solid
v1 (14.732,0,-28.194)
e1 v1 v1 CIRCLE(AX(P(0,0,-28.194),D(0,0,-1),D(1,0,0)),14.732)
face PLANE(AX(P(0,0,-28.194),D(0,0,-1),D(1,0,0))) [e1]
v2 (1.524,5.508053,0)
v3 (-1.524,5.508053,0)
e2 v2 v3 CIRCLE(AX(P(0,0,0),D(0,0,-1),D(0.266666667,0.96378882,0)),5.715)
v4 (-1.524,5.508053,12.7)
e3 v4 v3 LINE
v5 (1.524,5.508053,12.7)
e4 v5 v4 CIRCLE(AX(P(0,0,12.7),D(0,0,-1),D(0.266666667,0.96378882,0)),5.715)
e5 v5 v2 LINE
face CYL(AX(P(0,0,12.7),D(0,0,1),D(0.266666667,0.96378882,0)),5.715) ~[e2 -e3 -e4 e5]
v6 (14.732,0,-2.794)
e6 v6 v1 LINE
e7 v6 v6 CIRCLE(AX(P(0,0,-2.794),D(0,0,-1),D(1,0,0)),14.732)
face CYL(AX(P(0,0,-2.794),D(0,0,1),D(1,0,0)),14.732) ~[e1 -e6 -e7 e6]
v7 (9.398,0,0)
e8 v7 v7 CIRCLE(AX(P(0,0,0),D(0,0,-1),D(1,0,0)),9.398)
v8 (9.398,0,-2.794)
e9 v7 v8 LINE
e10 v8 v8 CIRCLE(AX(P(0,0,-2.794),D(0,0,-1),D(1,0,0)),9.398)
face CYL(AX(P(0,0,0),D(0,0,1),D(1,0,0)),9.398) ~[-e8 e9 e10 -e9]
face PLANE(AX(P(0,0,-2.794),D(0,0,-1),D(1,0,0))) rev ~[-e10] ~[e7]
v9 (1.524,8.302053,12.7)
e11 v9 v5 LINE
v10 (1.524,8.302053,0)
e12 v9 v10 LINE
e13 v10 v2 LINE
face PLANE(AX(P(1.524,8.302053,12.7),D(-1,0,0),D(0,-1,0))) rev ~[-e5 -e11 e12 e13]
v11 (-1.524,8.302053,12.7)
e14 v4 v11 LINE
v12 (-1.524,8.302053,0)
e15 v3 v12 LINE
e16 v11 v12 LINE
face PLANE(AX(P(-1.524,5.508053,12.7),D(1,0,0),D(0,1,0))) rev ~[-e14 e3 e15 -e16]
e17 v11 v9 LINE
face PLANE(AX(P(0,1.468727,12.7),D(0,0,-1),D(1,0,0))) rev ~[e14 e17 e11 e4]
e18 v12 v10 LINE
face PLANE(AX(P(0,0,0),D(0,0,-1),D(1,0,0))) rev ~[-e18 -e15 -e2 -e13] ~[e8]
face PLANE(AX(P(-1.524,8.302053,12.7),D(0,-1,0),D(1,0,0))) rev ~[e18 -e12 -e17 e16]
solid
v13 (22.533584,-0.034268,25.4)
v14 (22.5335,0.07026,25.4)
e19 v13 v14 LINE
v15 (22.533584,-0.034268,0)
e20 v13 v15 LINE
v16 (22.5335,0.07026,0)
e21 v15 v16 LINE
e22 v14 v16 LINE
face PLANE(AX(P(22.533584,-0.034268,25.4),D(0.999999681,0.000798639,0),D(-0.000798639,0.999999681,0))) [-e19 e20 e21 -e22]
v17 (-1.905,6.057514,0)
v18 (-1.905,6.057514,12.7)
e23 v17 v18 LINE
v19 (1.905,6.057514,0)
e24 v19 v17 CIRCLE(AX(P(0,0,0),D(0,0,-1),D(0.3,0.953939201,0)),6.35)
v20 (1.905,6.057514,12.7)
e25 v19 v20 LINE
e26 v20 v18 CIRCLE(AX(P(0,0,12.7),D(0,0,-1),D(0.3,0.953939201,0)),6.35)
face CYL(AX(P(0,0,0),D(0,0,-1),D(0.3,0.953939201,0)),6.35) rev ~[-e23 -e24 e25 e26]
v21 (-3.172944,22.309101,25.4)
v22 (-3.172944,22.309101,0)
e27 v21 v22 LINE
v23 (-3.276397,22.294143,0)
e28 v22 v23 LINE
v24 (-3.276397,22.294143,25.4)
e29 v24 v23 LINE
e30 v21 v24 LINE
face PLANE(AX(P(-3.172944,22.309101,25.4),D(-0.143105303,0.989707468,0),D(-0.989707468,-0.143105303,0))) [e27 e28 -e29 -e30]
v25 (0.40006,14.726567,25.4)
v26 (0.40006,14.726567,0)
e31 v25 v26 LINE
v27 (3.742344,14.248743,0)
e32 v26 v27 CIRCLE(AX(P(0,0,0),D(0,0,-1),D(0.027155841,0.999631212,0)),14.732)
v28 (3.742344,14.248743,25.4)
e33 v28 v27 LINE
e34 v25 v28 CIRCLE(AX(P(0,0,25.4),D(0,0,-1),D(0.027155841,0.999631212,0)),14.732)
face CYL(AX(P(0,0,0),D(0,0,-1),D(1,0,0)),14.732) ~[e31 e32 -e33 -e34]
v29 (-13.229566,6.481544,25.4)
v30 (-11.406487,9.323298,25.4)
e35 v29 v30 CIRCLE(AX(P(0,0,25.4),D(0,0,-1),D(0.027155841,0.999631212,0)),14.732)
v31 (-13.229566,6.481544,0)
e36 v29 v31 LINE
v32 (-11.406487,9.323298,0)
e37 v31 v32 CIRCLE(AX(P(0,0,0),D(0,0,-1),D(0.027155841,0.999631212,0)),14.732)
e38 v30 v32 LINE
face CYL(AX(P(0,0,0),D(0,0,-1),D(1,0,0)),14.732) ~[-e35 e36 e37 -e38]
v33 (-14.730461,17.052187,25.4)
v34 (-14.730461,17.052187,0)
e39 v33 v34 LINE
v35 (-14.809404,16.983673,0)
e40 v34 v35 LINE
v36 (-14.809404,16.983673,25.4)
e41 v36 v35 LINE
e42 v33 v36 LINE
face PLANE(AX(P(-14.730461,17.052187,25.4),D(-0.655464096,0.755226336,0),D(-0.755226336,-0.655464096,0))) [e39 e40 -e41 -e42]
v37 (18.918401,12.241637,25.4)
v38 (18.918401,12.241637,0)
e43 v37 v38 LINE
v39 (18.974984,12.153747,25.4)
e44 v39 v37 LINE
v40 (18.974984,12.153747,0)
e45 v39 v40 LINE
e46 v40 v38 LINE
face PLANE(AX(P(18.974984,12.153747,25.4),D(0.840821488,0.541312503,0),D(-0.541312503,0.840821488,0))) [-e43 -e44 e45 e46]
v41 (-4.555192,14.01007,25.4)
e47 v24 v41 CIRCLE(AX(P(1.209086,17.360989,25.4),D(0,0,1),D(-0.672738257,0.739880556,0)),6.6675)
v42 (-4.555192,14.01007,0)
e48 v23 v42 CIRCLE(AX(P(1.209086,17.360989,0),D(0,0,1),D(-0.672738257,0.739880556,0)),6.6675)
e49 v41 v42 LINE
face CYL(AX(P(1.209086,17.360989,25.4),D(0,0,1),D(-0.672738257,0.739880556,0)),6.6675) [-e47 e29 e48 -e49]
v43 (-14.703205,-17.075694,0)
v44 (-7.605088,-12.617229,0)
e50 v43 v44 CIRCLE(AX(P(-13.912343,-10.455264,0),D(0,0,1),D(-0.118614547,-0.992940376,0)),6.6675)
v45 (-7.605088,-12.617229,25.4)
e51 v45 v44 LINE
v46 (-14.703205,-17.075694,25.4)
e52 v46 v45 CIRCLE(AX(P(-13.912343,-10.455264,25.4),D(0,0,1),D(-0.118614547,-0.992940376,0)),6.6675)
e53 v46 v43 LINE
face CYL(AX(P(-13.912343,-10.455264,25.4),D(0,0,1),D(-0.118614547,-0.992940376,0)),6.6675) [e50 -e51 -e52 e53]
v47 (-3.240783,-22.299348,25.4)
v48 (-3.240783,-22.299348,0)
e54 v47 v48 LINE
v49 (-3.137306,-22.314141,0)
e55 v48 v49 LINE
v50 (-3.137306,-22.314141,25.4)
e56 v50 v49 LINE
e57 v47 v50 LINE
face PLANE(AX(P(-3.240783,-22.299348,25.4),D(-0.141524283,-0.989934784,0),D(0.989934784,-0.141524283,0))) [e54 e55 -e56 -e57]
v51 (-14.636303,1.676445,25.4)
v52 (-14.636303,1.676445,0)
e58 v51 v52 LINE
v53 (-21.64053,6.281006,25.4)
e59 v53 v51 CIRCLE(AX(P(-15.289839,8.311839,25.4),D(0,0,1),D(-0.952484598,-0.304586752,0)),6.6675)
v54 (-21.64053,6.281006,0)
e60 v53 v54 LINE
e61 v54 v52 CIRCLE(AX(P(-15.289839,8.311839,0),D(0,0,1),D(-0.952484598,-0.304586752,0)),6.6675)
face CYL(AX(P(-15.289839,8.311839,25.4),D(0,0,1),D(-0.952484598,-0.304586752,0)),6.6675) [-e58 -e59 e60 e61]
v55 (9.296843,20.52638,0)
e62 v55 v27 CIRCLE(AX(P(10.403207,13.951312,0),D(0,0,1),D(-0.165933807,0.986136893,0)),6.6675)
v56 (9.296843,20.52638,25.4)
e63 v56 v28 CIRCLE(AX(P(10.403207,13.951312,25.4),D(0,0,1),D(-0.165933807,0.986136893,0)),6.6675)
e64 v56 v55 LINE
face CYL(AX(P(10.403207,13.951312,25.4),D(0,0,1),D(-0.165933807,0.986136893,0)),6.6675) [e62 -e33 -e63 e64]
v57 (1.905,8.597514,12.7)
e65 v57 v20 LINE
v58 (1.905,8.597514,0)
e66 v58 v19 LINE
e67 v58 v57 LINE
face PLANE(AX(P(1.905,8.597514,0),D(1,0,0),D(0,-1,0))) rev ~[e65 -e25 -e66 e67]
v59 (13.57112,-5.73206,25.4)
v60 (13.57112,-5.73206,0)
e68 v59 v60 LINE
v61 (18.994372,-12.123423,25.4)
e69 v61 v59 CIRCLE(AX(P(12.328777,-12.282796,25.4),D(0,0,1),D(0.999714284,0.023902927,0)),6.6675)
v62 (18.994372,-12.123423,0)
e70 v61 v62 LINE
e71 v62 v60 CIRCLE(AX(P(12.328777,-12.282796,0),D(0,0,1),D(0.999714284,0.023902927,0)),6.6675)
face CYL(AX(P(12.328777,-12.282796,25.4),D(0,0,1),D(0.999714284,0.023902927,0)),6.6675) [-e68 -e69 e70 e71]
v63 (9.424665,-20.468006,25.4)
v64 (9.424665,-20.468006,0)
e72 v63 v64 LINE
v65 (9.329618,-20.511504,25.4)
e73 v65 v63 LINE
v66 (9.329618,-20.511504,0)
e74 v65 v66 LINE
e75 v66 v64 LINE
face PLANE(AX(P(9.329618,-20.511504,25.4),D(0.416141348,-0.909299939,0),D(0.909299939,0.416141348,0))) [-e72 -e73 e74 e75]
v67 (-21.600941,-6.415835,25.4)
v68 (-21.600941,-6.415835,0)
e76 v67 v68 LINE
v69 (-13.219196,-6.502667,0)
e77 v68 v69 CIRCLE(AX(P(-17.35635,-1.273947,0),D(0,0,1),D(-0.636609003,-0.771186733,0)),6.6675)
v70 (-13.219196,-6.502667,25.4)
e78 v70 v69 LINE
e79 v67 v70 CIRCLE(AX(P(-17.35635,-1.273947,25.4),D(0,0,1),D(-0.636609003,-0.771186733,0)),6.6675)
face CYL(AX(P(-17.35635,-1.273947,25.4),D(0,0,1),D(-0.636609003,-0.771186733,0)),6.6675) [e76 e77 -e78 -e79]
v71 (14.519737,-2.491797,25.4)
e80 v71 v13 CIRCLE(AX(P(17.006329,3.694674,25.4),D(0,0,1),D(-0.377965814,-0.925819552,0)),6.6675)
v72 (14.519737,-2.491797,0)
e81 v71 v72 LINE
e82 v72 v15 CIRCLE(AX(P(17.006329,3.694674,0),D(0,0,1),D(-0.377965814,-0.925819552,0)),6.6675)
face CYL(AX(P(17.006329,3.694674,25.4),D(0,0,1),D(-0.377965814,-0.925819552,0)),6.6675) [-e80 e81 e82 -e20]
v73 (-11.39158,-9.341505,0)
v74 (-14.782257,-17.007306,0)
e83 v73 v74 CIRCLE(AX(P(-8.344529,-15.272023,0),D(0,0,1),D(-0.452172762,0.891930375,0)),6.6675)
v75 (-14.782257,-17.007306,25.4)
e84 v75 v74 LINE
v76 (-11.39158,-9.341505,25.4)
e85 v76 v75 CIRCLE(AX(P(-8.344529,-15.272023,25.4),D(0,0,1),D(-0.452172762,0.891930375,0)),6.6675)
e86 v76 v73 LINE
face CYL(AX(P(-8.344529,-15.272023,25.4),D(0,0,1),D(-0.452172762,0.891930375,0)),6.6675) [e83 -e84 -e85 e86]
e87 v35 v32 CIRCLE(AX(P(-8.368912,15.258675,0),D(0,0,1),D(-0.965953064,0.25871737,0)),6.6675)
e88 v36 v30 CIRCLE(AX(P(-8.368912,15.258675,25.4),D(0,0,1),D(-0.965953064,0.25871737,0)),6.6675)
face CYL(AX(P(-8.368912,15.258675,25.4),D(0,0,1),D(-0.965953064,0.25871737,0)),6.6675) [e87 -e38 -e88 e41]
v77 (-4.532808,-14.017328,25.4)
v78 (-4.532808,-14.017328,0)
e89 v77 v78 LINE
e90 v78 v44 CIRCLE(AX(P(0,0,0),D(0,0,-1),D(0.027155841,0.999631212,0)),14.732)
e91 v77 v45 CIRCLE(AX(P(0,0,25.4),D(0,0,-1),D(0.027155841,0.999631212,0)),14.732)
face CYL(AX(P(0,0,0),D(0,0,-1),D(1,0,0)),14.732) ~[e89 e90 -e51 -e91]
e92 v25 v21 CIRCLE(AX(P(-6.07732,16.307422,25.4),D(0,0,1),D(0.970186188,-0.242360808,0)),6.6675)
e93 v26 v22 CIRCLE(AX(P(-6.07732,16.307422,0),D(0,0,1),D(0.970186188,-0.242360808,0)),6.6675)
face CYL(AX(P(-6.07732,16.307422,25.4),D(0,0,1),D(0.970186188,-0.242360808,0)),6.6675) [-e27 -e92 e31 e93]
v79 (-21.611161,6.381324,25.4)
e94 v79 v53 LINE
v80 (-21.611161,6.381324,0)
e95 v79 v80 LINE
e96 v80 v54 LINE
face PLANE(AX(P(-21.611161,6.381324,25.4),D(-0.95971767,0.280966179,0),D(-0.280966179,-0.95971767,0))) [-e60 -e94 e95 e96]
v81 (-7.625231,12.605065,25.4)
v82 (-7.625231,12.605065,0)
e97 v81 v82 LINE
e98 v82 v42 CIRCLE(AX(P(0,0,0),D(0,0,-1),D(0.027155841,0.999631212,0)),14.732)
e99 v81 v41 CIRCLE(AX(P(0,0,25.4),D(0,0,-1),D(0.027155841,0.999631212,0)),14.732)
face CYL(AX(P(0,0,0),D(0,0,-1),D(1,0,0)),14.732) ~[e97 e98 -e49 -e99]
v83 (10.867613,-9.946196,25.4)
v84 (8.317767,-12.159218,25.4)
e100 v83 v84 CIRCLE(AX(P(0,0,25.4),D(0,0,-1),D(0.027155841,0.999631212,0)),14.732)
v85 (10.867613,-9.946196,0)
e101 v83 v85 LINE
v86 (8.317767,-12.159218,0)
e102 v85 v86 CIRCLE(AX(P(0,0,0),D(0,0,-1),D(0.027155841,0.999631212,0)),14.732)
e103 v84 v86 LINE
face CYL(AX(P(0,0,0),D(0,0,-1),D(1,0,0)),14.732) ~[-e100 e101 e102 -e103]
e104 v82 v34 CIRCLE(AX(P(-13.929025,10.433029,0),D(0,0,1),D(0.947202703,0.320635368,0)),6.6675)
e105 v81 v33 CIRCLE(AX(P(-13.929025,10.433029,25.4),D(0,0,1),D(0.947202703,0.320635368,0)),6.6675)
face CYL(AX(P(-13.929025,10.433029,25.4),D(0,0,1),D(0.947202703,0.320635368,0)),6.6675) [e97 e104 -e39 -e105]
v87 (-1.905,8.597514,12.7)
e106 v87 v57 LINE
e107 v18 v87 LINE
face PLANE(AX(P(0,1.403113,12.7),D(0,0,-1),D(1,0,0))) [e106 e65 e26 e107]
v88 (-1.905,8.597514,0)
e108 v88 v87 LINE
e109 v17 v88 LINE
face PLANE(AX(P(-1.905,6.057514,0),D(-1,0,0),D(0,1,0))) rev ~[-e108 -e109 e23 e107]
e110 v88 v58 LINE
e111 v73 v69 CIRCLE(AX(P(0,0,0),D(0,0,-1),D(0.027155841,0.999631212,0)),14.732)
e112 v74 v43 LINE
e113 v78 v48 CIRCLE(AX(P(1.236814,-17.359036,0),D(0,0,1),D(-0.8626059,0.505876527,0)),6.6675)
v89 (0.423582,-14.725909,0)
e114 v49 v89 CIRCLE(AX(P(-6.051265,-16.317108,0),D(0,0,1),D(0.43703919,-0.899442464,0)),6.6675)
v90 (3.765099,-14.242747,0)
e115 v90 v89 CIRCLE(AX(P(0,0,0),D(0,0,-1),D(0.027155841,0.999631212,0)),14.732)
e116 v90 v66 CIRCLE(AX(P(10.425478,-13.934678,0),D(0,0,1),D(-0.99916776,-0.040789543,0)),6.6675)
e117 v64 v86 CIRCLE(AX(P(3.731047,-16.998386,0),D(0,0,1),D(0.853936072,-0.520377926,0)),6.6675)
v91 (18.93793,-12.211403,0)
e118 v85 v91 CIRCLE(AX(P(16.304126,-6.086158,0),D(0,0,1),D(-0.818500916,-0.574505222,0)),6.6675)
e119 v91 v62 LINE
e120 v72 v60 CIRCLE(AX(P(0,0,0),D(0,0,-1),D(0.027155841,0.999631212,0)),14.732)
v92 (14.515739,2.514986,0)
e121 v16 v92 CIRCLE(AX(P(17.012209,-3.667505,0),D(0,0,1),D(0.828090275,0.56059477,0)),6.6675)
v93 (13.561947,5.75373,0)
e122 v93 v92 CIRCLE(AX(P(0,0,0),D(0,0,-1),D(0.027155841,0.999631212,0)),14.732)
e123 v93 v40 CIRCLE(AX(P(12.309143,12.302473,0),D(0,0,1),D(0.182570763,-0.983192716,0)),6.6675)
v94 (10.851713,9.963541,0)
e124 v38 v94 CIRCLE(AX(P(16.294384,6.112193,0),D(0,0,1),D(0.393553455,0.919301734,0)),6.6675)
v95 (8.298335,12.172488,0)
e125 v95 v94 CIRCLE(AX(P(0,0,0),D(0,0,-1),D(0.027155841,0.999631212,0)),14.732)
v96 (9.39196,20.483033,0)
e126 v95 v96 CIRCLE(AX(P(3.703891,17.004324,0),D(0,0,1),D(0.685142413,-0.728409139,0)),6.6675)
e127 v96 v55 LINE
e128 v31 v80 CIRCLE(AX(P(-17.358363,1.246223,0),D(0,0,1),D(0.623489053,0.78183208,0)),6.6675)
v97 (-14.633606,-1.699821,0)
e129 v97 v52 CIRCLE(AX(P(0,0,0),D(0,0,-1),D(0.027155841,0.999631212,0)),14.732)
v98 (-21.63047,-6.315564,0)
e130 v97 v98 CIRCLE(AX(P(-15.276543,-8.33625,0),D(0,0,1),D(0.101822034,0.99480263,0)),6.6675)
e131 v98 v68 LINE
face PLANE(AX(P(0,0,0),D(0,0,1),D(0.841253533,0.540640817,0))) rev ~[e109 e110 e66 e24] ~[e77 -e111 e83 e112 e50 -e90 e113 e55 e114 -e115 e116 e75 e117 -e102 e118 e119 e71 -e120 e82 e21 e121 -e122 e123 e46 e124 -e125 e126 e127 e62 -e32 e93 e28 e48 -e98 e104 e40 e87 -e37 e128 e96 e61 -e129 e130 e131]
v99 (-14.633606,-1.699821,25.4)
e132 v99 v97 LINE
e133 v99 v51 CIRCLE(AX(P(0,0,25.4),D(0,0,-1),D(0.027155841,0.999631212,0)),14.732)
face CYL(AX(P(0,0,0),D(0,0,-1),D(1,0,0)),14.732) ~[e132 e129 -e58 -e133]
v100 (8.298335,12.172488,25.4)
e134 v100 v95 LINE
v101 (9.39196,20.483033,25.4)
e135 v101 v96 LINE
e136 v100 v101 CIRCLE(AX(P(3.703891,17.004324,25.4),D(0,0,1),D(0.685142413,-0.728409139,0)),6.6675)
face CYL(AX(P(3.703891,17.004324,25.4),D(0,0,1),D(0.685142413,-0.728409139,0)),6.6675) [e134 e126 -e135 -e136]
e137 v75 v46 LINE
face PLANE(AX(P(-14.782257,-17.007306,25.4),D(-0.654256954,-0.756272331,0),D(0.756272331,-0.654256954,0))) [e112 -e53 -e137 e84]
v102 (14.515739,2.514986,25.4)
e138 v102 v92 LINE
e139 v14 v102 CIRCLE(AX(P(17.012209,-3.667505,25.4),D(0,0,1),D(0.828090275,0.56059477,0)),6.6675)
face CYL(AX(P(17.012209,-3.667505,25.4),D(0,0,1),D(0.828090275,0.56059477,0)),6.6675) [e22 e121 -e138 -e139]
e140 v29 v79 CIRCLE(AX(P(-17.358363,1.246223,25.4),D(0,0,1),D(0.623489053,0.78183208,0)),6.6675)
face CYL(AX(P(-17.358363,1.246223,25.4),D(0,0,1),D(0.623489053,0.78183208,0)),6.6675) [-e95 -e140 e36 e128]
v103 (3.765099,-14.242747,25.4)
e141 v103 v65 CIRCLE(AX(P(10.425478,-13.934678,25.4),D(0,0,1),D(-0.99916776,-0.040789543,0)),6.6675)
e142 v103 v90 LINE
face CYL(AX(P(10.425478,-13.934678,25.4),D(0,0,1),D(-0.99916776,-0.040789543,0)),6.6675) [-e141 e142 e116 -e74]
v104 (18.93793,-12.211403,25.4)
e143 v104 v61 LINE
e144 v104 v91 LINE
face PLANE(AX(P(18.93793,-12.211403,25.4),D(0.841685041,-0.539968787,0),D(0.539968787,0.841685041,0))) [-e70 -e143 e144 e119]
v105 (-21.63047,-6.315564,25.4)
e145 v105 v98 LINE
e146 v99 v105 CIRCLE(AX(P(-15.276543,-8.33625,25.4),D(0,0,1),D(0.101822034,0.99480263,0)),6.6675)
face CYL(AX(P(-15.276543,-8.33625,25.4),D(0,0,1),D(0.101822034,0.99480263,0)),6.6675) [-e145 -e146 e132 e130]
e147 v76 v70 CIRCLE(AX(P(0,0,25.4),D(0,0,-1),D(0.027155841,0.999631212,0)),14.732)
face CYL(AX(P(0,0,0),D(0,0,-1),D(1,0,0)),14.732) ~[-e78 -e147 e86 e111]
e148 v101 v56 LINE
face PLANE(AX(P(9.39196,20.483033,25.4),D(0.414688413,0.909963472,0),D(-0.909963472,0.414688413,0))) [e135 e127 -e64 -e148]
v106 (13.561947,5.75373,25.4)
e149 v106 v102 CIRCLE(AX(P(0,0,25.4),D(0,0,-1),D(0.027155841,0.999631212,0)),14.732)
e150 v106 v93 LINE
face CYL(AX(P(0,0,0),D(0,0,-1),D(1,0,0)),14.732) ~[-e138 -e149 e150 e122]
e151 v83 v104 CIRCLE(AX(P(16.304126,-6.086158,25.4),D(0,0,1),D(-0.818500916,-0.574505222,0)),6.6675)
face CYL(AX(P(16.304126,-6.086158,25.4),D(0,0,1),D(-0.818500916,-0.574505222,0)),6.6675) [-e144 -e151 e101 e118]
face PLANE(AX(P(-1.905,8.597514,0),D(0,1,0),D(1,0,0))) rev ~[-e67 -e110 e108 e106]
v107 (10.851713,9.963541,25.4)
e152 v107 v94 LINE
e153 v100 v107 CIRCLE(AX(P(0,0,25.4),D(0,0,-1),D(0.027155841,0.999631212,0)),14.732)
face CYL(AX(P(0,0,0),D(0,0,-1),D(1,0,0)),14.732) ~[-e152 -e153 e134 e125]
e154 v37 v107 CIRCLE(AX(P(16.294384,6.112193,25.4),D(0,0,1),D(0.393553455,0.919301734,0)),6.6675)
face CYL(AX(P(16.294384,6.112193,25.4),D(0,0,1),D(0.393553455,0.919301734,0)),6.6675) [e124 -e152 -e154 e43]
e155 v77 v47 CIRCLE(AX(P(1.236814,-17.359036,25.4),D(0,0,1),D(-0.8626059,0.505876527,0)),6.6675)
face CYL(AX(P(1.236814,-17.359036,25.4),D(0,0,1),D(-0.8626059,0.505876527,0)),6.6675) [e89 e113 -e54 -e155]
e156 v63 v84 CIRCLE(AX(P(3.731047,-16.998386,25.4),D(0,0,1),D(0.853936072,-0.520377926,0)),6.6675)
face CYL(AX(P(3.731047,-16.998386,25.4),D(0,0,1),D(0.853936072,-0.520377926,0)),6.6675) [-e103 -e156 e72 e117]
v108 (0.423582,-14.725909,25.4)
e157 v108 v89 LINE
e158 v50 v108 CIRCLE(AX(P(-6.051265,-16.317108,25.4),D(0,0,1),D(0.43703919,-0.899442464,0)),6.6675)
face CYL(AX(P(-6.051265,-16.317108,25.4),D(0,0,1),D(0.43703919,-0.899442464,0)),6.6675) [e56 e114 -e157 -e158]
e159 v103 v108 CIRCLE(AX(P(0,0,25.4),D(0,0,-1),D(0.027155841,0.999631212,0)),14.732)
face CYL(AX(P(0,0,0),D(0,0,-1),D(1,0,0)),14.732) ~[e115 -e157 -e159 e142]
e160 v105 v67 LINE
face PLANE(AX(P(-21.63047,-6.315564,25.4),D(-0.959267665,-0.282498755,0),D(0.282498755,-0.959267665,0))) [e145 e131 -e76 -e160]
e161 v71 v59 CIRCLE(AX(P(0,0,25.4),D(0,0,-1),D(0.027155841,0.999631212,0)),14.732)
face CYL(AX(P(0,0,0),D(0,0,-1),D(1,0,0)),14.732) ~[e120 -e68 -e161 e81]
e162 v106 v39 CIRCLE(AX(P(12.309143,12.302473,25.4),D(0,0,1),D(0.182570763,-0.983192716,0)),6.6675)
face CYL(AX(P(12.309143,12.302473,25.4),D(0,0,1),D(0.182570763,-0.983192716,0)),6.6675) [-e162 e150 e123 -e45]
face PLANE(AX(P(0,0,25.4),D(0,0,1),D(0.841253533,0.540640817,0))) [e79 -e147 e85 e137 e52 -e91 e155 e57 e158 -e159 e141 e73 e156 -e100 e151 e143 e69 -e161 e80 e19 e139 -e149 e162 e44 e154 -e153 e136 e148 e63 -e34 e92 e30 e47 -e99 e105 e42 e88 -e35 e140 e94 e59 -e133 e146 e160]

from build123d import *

# Parameters (mm, degrees)
F0_R      = 14.732
F1_DEPTH  = 25.4
F3_DEPTH  = 25.4
F4_COUNT  = 11
F6_DEPTH  = 12.7
F8_DEPTH  = 12.7
F9_R      = 9.398
F10_DEPTH = 2.794
F11_R     = 14.732
F12_DEPTH = 25.4


with BuildPart() as f1:
    # F0 (on Top) → F1 (new body)
    with BuildSketch(Plane.XY):
        Circle(F0_R)
    extrude(amount=F1_DEPTH)

    # F2 (on face) → F3 (join, through all)
    with BuildSketch(Plane.XY.offset(25.4)):
        with BuildLine():
            Line((-4.5369443263, 13.978875159), (0.3913960902, 14.6914813287))
            ThreePointArc((0.3913960902, 14.6914813287), (-0.0382185694, 19.133161975), (-3.1729441601, 22.3091013936))
            Line((-3.1729441601, 22.3091013936), (-3.2763966599, 22.2941428308))
            ThreePointArc((-3.2763966599, 22.2941428308), (-5.3830975977, 18.3603270143), (-4.5369443263, 13.978875159))
        make_face()
    extrude(amount=-F3_DEPTH)

    # F4: F1 ×11 about axis
    f4_axis = Axis((0, 0, 25.4), (0, 0, -1))


with BuildPart() as f1_1:
    add(f1.part)
    for i in range(1, F4_COUNT):
        add(f1.part.rotate(f4_axis, i * 360 / F4_COUNT))

    # F5 (on face) → F6 (cut)
    with BuildSketch(Plane(origin=(0, 0, 0), x_dir=(1, 0, 0), z_dir=(0, 0, -1))):
        with BuildLine():
            Line((1.905, -8.597513929), (1.905, -6.057513929))
            ThreePointArc((1.905, -6.057513929), (0, 6.35), (-1.905, -6.057513929))
            Line((-1.905, -6.057513929), (-1.905, -8.597513929))
            Line((-1.905, -8.597513929), (1.905, -8.597513929))
        make_face()
    extrude(amount=-F6_DEPTH, mode=Mode.SUBTRACT)


with BuildPart() as f8:
    # F7 (on face) → F8 (new body, through all)
    with BuildSketch(Plane(origin=(0, 0, 12.7), x_dir=(1, 0, 0), z_dir=(0, 0, -1))):
        with BuildLine():
            Line((1.524, -8.3020531043), (1.524, -5.5080531043))
            ThreePointArc((1.524, -5.5080531043), (0, 5.715), (-1.524, -5.5080531043))
            Line((-1.524, -5.5080531043), (-1.524, -8.3020531043))
            Line((-1.524, -8.3020531043), (1.524, -8.3020531043))
        make_face()
    extrude(amount=F8_DEPTH)

    # F9 (on face) → F10 (join)
    with BuildSketch(Plane(origin=(0, 0, 0), x_dir=(1, 0, 0), z_dir=(0, 0, -1))):
        Circle(F9_R)
    extrude(amount=F10_DEPTH)

    # F11 (on face) → F12 (join)
    with BuildSketch(Plane(origin=(0, 0, -2.794), x_dir=(1, 0, 0), z_dir=(0, 0, -1))):
        Circle(F11_R)
    extrude(amount=F12_DEPTH)


solid = Compound([f1_1.part, f8.part])
